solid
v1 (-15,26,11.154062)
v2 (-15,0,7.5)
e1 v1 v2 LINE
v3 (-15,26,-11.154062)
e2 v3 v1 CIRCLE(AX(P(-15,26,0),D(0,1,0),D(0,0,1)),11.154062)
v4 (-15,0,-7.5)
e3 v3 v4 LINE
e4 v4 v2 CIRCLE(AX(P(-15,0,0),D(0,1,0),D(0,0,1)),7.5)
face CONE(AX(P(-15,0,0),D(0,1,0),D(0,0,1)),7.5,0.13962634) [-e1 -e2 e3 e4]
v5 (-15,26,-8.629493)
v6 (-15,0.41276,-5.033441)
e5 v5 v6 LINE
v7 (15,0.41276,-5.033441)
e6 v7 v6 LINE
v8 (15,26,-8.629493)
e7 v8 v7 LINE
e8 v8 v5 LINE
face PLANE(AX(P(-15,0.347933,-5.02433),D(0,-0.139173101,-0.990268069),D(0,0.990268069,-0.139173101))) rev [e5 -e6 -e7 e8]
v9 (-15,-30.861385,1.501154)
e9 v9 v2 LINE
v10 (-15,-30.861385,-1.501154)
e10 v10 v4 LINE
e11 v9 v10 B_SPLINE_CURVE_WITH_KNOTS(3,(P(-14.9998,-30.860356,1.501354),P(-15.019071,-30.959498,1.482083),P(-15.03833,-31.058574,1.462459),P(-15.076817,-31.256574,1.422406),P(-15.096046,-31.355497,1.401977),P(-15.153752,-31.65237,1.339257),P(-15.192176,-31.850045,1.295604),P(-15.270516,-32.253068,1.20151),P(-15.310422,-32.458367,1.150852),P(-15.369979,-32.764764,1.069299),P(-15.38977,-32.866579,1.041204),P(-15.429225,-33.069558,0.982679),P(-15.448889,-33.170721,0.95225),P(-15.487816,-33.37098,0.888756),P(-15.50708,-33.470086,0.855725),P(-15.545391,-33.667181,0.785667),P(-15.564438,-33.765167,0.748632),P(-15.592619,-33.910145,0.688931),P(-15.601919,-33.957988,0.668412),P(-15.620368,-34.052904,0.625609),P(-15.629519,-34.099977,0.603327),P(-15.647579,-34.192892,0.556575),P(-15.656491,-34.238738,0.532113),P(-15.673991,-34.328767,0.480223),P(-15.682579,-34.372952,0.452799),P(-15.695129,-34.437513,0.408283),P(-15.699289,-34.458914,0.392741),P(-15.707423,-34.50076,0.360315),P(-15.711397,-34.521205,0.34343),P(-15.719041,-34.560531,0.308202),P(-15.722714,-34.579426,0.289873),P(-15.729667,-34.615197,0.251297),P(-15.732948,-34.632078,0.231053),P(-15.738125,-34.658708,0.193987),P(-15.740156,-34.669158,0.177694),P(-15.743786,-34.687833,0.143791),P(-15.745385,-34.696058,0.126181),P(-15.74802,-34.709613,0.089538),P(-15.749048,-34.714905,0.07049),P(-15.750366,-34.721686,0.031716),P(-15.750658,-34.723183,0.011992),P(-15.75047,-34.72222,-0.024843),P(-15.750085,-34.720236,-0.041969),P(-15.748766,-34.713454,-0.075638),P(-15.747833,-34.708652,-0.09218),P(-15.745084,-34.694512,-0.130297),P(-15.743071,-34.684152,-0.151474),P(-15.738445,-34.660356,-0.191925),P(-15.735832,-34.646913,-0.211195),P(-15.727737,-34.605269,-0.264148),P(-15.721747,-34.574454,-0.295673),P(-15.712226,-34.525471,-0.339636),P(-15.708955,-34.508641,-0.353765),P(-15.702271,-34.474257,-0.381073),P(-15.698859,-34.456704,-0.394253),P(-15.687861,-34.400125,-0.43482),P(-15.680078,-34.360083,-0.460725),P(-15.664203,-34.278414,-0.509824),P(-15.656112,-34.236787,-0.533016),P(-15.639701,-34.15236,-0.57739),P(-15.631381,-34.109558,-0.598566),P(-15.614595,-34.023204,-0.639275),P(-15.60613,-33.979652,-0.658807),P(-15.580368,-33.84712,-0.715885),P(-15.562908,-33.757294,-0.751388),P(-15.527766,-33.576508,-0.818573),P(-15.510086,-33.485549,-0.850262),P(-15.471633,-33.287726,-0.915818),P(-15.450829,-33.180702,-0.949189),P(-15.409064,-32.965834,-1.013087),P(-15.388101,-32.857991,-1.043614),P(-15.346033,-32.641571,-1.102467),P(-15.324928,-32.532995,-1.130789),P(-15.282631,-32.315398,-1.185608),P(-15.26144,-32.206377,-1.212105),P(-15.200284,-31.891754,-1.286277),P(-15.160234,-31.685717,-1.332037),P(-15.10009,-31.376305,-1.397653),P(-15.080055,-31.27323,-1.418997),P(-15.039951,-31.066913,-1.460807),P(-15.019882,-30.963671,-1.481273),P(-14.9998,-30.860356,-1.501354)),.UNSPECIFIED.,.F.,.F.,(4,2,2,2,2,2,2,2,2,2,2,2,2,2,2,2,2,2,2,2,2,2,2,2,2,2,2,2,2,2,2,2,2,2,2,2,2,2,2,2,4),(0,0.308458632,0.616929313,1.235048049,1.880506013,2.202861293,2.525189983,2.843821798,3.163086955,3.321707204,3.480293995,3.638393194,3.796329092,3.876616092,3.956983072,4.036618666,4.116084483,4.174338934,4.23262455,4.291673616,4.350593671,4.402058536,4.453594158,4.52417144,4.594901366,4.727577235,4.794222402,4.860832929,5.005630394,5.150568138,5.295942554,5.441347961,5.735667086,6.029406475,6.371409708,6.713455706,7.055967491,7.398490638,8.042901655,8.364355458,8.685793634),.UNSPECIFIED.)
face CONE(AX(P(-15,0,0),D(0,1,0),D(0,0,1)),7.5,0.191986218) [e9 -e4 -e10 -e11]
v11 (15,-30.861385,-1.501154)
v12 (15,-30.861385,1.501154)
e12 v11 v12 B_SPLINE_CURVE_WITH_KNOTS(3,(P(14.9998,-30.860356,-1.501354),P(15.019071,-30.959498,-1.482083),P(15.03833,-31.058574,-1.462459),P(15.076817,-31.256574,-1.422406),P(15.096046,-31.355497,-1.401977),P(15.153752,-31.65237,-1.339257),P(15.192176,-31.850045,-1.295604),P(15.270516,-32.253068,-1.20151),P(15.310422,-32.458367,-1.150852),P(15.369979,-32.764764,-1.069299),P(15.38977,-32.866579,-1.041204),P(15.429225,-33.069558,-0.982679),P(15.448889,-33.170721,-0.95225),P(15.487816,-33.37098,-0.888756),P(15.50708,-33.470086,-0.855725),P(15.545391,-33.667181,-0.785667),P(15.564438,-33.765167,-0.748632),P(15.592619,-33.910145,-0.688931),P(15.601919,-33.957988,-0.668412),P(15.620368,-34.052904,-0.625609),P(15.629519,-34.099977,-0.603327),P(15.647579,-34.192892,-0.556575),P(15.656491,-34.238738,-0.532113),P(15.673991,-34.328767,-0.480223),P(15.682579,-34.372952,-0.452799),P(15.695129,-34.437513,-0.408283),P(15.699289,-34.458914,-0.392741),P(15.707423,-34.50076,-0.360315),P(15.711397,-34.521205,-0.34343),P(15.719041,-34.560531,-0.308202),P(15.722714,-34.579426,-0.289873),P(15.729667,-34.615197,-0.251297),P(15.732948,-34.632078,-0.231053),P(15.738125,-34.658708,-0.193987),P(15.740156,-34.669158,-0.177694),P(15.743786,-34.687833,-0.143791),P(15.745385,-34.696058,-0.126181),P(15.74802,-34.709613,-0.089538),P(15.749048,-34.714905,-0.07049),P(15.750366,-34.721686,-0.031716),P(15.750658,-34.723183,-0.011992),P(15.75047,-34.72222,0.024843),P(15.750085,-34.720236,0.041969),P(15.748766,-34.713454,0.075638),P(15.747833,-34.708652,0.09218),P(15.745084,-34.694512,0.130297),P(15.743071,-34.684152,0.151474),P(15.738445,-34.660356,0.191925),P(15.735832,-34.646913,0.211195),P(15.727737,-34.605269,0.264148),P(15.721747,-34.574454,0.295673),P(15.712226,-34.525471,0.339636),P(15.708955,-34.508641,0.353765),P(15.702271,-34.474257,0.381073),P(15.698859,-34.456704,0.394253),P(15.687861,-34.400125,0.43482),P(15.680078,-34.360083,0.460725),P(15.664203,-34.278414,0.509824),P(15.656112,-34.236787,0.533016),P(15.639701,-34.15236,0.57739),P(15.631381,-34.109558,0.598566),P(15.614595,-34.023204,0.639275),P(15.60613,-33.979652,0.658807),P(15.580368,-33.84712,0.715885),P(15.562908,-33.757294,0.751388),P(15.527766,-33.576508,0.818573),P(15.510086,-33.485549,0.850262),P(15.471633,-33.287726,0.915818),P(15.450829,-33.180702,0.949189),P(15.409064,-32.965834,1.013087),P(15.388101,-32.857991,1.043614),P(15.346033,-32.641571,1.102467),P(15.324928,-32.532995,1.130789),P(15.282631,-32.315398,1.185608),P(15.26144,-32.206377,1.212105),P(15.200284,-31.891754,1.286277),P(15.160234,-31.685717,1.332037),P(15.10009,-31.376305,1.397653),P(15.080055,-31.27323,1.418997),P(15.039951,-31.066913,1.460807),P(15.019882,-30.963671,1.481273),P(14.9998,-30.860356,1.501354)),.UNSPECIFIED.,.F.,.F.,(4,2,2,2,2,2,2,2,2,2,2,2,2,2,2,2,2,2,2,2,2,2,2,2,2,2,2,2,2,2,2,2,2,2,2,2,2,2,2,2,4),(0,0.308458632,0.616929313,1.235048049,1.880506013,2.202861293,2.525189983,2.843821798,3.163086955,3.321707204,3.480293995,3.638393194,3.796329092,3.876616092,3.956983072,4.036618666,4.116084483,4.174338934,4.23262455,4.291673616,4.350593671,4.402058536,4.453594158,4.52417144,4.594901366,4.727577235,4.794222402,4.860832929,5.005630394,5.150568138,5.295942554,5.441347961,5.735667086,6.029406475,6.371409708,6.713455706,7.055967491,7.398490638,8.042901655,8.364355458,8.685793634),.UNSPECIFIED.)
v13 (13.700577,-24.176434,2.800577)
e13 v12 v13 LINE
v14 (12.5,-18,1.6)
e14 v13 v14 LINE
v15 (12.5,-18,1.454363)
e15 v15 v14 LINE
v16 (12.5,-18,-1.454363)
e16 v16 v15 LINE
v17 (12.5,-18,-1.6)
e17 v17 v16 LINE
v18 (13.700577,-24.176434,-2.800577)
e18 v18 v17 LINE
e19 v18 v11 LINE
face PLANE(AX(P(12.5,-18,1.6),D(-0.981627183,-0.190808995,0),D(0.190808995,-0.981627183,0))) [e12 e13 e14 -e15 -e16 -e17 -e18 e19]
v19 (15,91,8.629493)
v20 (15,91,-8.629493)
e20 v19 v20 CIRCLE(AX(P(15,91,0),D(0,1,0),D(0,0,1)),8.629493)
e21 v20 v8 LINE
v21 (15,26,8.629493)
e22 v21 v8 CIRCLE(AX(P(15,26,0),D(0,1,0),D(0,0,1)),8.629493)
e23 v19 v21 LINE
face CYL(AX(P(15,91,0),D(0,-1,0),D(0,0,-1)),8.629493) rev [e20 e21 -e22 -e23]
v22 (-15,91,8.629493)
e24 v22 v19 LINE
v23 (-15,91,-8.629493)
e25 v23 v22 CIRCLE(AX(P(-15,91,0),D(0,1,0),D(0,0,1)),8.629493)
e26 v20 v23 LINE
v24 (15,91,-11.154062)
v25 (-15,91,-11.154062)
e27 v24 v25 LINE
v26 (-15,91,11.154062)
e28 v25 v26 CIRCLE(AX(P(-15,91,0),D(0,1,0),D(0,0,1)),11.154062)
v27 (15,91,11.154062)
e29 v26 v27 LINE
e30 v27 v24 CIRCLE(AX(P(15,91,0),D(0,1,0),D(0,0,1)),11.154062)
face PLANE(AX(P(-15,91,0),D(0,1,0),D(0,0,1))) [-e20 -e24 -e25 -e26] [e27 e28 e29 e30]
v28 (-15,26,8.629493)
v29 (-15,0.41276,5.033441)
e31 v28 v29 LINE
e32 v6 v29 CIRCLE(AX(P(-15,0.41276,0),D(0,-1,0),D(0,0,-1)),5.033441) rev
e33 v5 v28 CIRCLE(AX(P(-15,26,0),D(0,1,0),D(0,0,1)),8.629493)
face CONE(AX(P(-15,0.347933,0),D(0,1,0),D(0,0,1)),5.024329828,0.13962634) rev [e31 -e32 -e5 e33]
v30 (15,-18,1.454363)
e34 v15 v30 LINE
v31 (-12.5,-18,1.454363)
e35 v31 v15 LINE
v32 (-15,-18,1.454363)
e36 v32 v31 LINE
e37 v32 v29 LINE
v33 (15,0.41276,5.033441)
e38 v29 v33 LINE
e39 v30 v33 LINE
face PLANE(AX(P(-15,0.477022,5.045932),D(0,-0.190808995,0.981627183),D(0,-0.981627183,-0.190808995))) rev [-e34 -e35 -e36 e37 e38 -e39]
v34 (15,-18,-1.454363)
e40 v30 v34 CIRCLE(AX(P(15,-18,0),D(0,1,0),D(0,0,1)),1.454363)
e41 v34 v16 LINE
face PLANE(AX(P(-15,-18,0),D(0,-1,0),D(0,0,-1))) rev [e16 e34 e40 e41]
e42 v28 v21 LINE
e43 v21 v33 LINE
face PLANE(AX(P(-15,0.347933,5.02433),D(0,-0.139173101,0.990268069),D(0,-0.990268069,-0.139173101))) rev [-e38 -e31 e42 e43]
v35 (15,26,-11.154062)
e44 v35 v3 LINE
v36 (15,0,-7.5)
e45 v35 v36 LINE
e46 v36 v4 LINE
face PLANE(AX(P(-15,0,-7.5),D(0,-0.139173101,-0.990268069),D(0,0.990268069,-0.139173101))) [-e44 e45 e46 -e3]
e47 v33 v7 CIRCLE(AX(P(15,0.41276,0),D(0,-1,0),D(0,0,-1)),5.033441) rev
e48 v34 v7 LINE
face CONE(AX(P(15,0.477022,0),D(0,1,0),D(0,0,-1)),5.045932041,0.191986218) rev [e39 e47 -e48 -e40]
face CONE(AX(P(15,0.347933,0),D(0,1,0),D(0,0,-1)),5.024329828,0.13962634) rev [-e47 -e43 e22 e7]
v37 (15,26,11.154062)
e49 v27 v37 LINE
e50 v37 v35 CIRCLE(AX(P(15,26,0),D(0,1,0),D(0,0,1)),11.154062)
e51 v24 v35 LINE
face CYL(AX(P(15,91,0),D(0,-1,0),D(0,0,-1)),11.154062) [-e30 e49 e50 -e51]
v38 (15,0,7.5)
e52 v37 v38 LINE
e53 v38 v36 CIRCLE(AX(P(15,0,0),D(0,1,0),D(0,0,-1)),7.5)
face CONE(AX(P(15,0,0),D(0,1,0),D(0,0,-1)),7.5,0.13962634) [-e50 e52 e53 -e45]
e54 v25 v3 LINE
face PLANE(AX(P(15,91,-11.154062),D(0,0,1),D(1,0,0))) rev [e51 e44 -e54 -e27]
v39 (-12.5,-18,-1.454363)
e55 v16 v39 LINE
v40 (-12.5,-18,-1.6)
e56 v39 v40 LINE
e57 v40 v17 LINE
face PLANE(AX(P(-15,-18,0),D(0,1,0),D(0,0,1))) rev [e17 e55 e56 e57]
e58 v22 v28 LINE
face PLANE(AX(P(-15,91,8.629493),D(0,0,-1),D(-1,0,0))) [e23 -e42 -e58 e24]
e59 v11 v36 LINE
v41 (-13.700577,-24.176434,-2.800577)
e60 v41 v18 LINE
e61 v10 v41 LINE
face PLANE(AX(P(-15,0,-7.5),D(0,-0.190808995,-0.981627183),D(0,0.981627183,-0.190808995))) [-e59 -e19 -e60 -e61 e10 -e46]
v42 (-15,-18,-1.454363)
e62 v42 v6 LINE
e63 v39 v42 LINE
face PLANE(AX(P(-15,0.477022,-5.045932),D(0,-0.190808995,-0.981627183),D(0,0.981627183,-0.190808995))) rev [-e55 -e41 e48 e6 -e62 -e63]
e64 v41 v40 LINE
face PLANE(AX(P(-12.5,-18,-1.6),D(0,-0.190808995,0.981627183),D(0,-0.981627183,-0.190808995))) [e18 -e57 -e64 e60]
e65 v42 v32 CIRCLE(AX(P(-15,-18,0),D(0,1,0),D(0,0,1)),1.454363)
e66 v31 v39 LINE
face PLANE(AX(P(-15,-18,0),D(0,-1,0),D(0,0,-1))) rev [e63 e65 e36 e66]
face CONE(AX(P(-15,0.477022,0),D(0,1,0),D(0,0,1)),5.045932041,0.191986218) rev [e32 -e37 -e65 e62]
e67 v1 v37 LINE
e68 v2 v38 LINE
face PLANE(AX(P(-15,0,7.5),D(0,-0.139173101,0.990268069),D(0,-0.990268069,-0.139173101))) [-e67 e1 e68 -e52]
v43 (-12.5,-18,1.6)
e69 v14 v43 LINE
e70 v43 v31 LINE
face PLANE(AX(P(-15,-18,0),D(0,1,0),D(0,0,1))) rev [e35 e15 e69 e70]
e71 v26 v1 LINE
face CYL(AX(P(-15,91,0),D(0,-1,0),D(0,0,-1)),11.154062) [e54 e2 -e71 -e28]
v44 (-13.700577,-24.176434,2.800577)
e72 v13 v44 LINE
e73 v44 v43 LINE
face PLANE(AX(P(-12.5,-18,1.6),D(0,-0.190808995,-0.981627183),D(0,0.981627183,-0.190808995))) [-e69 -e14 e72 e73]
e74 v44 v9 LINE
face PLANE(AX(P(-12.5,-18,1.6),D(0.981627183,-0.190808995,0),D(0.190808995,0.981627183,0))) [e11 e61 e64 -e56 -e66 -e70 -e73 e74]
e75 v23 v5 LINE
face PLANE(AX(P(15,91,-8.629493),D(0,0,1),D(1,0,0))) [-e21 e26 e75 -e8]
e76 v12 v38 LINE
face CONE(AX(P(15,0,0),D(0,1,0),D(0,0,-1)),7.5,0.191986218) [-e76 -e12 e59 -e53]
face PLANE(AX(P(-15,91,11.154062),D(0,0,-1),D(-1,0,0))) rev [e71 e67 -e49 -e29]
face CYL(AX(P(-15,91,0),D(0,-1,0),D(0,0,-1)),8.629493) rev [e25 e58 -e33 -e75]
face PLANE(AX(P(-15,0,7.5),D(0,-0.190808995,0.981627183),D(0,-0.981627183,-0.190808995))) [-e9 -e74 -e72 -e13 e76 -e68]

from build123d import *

# Parameters (mm, degrees)
BOSS_EXTRUDE1_DEPTH           = 18
BOSS_EXTRUDE1_TAPER           = 11
BOSS_EXTRUDE1_OTHER_WAY_DEPTH = 26
BOSS_EXTRUDE1_OTHER_WAY_TAPER = -8
SHELL1_START                  = -15
SHELL1_DEPTH                  = 30
SKETCH2_W                     = 25
SKETCH2_H                     = 3.2
BOSS_EXTRUDE2_DEPTH           = 20
BOSS_EXTRUDE2_TAPER           = 11
BOSS_EXTRUDE3_DEPTH           = 65


with BuildPart() as part:
    # Sketch1 → Boss-Extrude1 (new body)
    with BuildSketch(Plane(origin=(0, 0, 0), x_dir=(1, 0, 0), z_dir=(0, 1, 0))):
        with BuildLine():
            ThreePointArc((-15, 7.5), (-22.5, 0), (-15, -7.5))
            Line((-15, -7.5), (15, -7.5))
            ThreePointArc((15, -7.5), (22.5, 0), (15, 7.5))
            Line((15, 7.5), (-15, 7.5))
        make_face()
    extrude(amount=-BOSS_EXTRUDE1_DEPTH, taper=BOSS_EXTRUDE1_TAPER)

    # Sketch1 → Boss-Extrude1 other way (add)
    with BuildSketch(Plane(origin=(0, 0, 0), x_dir=(1, 0, 0), z_dir=(0, 1, 0))):
        with BuildLine():
            ThreePointArc((-15, 7.5), (-22.5, 0), (-15, -7.5))
            Line((-15, -7.5), (15, -7.5))
            ThreePointArc((15, -7.5), (22.5, 0), (15, 7.5))
            Line((15, 7.5), (-15, 7.5))
        make_face()
    extrude(amount=BOSS_EXTRUDE1_OTHER_WAY_DEPTH, taper=BOSS_EXTRUDE1_OTHER_WAY_TAPER)

    # Shell1: read off the stored shape, not the designer's step
    # Shell1 outline → Shell1 (cut)
    with BuildSketch(Plane.YZ.offset(SHELL1_START)):
        Polygon((26, -8.629492771), (26, 8.629492771), (0.412760457, 5.033440768), (-18, 1.454362698), (-18, -1.454362698), (0.412760457, -5.033440768), align=None)
    extrude(amount=SHELL1_DEPTH, mode=Mode.SUBTRACT)

    # Shell1 2 outline → Shell1 2 (revolve, cut)
    with BuildSketch(Plane(origin=(-15, 0, 0), x_dir=(1, 0, 0), z_dir=(0, 0, 1))):
        Polygon((1.454362698, -18), (5.033440768, 0.412760457), (8.629492771, 26), (0, 26), (0, -18), align=None)
    revolve(axis=Axis((-15, 0, 0), (0, 1, 0)), mode=Mode.SUBTRACT)

    # Shell1 3 outline → Shell1 3 (revolve, cut)
    with BuildSketch(Plane(origin=(15, 0, 0), x_dir=(1, 0, 0), z_dir=(0, 0, 1))):
        Polygon((1.454362698, -18), (5.033440768, 0.412760457), (8.629492771, 26), (0, 26), (0, -18), align=None)
    revolve(axis=Axis((15, 0, 0), (0, 1, 0)), mode=Mode.SUBTRACT)

    # Sketch2 → Boss-Extrude2 (add)
    with BuildSketch(Plane.XZ.offset(18)):
        with BuildLine():
            ThreePointArc((-15, 4.001154436), (-19.001154436, 0), (-15, -4.001154436))
            Line((-15, -4.001154436), (15, -4.001154436))
            ThreePointArc((15, -4.001154436), (19.001154436, 0), (15, 4.001154436))
            Line((15, 4.001154436), (-15, 4.001154436))
        make_face()
        Rectangle(SKETCH2_W, SKETCH2_H, mode=Mode.SUBTRACT)
    extrude(amount=BOSS_EXTRUDE2_DEPTH, taper=BOSS_EXTRUDE2_TAPER)

    # Sketch3 → Boss-Extrude3 (add)
    with BuildSketch(Plane(origin=(0, 26, 0), x_dir=(1, 0, 0), z_dir=(0, 1, 0))):
        with BuildLine():
            Line((-15, -11.154061702), (15, -11.154061702))
            ThreePointArc((15, -11.154061702), (26.154061702, 0), (15, 11.154061702))
            Line((15, 11.154061702), (-15, 11.154061702))
            ThreePointArc((-15, 11.154061702), (-26.154061702, 0), (-15, -11.154061702))
        make_face()
        with BuildLine():
            Line((-15, -8.629492771), (15, -8.629492771))
            ThreePointArc((15, -8.629492771), (23.629492771, 0), (15, 8.629492771))
            Line((15, 8.629492771), (-15, 8.629492771))
            ThreePointArc((-15, 8.629492771), (-23.629492771, 0), (-15, -8.629492771))
        make_face(mode=Mode.SUBTRACT)
    extrude(amount=BOSS_EXTRUDE3_DEPTH)


solid = part.part
